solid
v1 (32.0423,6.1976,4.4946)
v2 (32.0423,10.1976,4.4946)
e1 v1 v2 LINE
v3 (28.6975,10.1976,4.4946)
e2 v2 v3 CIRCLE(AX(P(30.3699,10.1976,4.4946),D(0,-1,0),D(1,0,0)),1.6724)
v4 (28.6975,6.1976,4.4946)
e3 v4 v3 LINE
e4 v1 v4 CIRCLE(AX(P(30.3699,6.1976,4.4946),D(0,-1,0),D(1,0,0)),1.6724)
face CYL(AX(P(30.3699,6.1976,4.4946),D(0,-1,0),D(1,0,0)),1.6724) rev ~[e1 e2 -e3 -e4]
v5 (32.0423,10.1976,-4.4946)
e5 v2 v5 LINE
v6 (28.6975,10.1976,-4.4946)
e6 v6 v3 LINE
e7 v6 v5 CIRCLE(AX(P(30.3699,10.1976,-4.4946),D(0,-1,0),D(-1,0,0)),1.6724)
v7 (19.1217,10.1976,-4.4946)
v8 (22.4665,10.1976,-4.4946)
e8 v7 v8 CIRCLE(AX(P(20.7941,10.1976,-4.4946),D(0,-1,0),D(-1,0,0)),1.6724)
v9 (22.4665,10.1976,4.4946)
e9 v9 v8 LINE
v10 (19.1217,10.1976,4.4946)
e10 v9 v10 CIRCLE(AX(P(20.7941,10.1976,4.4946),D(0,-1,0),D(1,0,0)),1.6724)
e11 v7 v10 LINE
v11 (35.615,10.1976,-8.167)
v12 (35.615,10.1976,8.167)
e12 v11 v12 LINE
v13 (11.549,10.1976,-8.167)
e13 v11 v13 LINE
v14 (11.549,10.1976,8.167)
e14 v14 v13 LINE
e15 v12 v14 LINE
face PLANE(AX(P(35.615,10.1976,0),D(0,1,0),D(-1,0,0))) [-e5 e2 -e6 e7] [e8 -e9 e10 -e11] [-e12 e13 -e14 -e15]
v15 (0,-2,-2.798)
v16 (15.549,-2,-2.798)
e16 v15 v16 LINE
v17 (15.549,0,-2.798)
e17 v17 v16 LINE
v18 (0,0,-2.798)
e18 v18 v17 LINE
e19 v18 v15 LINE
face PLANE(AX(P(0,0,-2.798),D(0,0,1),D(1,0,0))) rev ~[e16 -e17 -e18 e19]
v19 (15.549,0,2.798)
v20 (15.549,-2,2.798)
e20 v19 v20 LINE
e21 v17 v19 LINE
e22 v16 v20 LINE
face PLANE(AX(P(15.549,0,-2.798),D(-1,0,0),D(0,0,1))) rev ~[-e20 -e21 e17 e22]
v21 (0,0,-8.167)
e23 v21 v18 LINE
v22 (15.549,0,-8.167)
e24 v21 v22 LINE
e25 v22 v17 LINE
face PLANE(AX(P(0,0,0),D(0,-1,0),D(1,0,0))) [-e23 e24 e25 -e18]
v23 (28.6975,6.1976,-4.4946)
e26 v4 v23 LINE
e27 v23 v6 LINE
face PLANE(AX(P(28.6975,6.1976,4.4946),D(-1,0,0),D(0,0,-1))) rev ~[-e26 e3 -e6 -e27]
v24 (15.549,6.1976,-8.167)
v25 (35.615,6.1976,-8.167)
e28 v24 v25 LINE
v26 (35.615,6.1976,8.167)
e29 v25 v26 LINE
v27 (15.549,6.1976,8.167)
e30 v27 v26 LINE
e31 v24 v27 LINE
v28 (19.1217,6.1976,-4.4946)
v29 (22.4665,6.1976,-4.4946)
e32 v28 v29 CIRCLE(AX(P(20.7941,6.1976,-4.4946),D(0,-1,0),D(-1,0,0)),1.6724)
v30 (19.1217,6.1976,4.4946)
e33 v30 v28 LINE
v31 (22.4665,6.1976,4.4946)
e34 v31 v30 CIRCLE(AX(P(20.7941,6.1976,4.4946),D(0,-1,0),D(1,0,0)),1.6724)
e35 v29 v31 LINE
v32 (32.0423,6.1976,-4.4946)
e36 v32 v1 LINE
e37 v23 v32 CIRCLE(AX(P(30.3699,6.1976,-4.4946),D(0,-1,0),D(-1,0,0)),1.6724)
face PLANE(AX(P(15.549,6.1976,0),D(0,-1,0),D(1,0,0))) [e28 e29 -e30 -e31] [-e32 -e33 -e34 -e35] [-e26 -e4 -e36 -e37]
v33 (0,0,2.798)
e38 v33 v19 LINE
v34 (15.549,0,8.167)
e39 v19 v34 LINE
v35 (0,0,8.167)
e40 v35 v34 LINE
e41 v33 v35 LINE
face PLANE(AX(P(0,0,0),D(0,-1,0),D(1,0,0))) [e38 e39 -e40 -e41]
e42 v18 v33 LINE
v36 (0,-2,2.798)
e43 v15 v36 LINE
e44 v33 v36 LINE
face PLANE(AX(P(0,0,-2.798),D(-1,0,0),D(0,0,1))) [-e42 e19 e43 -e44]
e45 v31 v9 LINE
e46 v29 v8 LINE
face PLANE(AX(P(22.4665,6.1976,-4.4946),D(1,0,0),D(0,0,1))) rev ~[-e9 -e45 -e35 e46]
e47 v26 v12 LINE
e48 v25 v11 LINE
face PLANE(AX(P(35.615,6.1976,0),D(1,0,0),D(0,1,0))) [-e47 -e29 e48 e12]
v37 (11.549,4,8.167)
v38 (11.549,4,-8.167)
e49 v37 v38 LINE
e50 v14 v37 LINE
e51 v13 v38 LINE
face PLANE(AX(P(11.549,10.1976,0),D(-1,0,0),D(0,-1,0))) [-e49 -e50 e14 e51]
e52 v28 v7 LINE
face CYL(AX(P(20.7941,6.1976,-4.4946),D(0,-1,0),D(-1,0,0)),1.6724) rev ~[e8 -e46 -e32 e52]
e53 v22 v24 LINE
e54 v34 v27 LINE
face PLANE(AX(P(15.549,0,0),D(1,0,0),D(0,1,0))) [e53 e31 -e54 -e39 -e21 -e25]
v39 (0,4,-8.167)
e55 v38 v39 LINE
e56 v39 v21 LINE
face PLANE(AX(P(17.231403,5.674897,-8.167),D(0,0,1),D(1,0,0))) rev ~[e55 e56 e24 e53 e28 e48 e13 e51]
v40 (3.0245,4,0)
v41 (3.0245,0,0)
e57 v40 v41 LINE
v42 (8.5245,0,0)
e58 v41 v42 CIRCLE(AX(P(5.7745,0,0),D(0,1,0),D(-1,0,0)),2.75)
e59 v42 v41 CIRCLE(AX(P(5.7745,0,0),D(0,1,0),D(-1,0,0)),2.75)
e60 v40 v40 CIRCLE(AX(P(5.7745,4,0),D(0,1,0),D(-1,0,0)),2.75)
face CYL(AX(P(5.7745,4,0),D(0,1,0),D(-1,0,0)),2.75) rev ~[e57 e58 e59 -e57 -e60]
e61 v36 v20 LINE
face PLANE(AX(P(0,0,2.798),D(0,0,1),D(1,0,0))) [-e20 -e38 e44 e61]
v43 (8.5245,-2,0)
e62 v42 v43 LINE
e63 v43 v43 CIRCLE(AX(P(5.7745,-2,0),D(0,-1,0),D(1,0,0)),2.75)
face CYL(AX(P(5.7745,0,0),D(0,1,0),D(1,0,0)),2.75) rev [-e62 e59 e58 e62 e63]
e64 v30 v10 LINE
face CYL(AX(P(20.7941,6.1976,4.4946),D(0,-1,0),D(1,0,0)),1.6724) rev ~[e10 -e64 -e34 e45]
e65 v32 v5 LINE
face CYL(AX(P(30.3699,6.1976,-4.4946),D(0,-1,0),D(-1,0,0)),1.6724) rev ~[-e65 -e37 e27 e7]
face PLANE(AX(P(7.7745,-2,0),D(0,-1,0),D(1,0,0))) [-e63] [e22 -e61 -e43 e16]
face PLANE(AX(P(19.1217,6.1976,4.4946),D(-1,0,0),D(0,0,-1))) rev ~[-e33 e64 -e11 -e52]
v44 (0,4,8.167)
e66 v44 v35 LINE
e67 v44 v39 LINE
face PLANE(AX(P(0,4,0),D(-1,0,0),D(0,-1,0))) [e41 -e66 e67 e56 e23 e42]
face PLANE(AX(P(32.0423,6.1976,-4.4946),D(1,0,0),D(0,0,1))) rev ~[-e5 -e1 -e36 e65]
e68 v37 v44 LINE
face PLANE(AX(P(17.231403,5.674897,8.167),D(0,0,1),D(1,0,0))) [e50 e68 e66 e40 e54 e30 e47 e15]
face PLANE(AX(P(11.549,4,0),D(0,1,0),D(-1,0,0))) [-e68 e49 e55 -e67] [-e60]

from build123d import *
from build123d import SkipClean  # not in build123d's __all__

# Parameters (mm, degrees)
F1_DEPTH = 8.167
F2_R     = 2.75
F3_DEPTH = 4.001
F5_DEPTH = 4.001
F6_W     = 15.549
F6_H     = 5.596
F6_R     = 2.75
F7_DEPTH = 2


with BuildPart() as f1:
    # F0 (on Top) → F1 (new body, symmetric)
    with BuildSketch(Plane.XY):
        Polygon((0, 4), (0, 0), (15.549, 0), (15.549, 6.1976), (35.615, 6.1976), (35.615, 10.1976), (11.549, 10.1976), (11.549, 4), align=None)
    extrude(amount=F1_DEPTH, both=True)

    # F2 (on face) → F3 (cut, through all)
    with BuildSketch(Plane(origin=(0, 4, 0), x_dir=(-1, 0, 0), z_dir=(0, 1, 0))):
        with Locations((-5.7745, 0)):
            Circle(F2_R)
    extrude(amount=-F3_DEPTH, mode=Mode.SUBTRACT)

    # F4 (on face) → F5 (cut, through all)
    with BuildSketch(Plane.XZ.offset(-6.1976)):
        with BuildLine():
            ThreePointArc((22.4665, 4.4946), (20.7941, 6.167), (19.1217, 4.4946))
            Line((19.1217, 4.4946), (19.1217, -4.4946))
            ThreePointArc((19.1217, -4.4946), (20.7941, -6.167), (22.4665, -4.4946))
            Line((22.4665, -4.4946), (22.4665, 4.4946))
        make_face()
        with BuildLine():
            ThreePointArc((32.0423, 4.4946), (30.3699, 6.167), (28.6975, 4.4946))
            Line((28.6975, 4.4946), (28.6975, -4.4946))
            ThreePointArc((28.6975, -4.4946), (30.3699, -6.167), (32.0423, -4.4946))
            Line((32.0423, -4.4946), (32.0423, 4.4946))
        make_face()
    extrude(amount=-F5_DEPTH, mode=Mode.SUBTRACT)

    # F6 (on face) → F7 (join)
    with BuildSketch(Plane.XZ):
        with Locations((7.7745, 0)):
            Rectangle(F6_W, F6_H)
        with Locations((5.7745, 0)):
            Circle(F6_R, mode=Mode.SUBTRACT)
    with SkipClean():  # cleaning this boolean's faces spoils the solid; the shape is the same uncleaned
        extrude(amount=F7_DEPTH)


solid = f1.part
